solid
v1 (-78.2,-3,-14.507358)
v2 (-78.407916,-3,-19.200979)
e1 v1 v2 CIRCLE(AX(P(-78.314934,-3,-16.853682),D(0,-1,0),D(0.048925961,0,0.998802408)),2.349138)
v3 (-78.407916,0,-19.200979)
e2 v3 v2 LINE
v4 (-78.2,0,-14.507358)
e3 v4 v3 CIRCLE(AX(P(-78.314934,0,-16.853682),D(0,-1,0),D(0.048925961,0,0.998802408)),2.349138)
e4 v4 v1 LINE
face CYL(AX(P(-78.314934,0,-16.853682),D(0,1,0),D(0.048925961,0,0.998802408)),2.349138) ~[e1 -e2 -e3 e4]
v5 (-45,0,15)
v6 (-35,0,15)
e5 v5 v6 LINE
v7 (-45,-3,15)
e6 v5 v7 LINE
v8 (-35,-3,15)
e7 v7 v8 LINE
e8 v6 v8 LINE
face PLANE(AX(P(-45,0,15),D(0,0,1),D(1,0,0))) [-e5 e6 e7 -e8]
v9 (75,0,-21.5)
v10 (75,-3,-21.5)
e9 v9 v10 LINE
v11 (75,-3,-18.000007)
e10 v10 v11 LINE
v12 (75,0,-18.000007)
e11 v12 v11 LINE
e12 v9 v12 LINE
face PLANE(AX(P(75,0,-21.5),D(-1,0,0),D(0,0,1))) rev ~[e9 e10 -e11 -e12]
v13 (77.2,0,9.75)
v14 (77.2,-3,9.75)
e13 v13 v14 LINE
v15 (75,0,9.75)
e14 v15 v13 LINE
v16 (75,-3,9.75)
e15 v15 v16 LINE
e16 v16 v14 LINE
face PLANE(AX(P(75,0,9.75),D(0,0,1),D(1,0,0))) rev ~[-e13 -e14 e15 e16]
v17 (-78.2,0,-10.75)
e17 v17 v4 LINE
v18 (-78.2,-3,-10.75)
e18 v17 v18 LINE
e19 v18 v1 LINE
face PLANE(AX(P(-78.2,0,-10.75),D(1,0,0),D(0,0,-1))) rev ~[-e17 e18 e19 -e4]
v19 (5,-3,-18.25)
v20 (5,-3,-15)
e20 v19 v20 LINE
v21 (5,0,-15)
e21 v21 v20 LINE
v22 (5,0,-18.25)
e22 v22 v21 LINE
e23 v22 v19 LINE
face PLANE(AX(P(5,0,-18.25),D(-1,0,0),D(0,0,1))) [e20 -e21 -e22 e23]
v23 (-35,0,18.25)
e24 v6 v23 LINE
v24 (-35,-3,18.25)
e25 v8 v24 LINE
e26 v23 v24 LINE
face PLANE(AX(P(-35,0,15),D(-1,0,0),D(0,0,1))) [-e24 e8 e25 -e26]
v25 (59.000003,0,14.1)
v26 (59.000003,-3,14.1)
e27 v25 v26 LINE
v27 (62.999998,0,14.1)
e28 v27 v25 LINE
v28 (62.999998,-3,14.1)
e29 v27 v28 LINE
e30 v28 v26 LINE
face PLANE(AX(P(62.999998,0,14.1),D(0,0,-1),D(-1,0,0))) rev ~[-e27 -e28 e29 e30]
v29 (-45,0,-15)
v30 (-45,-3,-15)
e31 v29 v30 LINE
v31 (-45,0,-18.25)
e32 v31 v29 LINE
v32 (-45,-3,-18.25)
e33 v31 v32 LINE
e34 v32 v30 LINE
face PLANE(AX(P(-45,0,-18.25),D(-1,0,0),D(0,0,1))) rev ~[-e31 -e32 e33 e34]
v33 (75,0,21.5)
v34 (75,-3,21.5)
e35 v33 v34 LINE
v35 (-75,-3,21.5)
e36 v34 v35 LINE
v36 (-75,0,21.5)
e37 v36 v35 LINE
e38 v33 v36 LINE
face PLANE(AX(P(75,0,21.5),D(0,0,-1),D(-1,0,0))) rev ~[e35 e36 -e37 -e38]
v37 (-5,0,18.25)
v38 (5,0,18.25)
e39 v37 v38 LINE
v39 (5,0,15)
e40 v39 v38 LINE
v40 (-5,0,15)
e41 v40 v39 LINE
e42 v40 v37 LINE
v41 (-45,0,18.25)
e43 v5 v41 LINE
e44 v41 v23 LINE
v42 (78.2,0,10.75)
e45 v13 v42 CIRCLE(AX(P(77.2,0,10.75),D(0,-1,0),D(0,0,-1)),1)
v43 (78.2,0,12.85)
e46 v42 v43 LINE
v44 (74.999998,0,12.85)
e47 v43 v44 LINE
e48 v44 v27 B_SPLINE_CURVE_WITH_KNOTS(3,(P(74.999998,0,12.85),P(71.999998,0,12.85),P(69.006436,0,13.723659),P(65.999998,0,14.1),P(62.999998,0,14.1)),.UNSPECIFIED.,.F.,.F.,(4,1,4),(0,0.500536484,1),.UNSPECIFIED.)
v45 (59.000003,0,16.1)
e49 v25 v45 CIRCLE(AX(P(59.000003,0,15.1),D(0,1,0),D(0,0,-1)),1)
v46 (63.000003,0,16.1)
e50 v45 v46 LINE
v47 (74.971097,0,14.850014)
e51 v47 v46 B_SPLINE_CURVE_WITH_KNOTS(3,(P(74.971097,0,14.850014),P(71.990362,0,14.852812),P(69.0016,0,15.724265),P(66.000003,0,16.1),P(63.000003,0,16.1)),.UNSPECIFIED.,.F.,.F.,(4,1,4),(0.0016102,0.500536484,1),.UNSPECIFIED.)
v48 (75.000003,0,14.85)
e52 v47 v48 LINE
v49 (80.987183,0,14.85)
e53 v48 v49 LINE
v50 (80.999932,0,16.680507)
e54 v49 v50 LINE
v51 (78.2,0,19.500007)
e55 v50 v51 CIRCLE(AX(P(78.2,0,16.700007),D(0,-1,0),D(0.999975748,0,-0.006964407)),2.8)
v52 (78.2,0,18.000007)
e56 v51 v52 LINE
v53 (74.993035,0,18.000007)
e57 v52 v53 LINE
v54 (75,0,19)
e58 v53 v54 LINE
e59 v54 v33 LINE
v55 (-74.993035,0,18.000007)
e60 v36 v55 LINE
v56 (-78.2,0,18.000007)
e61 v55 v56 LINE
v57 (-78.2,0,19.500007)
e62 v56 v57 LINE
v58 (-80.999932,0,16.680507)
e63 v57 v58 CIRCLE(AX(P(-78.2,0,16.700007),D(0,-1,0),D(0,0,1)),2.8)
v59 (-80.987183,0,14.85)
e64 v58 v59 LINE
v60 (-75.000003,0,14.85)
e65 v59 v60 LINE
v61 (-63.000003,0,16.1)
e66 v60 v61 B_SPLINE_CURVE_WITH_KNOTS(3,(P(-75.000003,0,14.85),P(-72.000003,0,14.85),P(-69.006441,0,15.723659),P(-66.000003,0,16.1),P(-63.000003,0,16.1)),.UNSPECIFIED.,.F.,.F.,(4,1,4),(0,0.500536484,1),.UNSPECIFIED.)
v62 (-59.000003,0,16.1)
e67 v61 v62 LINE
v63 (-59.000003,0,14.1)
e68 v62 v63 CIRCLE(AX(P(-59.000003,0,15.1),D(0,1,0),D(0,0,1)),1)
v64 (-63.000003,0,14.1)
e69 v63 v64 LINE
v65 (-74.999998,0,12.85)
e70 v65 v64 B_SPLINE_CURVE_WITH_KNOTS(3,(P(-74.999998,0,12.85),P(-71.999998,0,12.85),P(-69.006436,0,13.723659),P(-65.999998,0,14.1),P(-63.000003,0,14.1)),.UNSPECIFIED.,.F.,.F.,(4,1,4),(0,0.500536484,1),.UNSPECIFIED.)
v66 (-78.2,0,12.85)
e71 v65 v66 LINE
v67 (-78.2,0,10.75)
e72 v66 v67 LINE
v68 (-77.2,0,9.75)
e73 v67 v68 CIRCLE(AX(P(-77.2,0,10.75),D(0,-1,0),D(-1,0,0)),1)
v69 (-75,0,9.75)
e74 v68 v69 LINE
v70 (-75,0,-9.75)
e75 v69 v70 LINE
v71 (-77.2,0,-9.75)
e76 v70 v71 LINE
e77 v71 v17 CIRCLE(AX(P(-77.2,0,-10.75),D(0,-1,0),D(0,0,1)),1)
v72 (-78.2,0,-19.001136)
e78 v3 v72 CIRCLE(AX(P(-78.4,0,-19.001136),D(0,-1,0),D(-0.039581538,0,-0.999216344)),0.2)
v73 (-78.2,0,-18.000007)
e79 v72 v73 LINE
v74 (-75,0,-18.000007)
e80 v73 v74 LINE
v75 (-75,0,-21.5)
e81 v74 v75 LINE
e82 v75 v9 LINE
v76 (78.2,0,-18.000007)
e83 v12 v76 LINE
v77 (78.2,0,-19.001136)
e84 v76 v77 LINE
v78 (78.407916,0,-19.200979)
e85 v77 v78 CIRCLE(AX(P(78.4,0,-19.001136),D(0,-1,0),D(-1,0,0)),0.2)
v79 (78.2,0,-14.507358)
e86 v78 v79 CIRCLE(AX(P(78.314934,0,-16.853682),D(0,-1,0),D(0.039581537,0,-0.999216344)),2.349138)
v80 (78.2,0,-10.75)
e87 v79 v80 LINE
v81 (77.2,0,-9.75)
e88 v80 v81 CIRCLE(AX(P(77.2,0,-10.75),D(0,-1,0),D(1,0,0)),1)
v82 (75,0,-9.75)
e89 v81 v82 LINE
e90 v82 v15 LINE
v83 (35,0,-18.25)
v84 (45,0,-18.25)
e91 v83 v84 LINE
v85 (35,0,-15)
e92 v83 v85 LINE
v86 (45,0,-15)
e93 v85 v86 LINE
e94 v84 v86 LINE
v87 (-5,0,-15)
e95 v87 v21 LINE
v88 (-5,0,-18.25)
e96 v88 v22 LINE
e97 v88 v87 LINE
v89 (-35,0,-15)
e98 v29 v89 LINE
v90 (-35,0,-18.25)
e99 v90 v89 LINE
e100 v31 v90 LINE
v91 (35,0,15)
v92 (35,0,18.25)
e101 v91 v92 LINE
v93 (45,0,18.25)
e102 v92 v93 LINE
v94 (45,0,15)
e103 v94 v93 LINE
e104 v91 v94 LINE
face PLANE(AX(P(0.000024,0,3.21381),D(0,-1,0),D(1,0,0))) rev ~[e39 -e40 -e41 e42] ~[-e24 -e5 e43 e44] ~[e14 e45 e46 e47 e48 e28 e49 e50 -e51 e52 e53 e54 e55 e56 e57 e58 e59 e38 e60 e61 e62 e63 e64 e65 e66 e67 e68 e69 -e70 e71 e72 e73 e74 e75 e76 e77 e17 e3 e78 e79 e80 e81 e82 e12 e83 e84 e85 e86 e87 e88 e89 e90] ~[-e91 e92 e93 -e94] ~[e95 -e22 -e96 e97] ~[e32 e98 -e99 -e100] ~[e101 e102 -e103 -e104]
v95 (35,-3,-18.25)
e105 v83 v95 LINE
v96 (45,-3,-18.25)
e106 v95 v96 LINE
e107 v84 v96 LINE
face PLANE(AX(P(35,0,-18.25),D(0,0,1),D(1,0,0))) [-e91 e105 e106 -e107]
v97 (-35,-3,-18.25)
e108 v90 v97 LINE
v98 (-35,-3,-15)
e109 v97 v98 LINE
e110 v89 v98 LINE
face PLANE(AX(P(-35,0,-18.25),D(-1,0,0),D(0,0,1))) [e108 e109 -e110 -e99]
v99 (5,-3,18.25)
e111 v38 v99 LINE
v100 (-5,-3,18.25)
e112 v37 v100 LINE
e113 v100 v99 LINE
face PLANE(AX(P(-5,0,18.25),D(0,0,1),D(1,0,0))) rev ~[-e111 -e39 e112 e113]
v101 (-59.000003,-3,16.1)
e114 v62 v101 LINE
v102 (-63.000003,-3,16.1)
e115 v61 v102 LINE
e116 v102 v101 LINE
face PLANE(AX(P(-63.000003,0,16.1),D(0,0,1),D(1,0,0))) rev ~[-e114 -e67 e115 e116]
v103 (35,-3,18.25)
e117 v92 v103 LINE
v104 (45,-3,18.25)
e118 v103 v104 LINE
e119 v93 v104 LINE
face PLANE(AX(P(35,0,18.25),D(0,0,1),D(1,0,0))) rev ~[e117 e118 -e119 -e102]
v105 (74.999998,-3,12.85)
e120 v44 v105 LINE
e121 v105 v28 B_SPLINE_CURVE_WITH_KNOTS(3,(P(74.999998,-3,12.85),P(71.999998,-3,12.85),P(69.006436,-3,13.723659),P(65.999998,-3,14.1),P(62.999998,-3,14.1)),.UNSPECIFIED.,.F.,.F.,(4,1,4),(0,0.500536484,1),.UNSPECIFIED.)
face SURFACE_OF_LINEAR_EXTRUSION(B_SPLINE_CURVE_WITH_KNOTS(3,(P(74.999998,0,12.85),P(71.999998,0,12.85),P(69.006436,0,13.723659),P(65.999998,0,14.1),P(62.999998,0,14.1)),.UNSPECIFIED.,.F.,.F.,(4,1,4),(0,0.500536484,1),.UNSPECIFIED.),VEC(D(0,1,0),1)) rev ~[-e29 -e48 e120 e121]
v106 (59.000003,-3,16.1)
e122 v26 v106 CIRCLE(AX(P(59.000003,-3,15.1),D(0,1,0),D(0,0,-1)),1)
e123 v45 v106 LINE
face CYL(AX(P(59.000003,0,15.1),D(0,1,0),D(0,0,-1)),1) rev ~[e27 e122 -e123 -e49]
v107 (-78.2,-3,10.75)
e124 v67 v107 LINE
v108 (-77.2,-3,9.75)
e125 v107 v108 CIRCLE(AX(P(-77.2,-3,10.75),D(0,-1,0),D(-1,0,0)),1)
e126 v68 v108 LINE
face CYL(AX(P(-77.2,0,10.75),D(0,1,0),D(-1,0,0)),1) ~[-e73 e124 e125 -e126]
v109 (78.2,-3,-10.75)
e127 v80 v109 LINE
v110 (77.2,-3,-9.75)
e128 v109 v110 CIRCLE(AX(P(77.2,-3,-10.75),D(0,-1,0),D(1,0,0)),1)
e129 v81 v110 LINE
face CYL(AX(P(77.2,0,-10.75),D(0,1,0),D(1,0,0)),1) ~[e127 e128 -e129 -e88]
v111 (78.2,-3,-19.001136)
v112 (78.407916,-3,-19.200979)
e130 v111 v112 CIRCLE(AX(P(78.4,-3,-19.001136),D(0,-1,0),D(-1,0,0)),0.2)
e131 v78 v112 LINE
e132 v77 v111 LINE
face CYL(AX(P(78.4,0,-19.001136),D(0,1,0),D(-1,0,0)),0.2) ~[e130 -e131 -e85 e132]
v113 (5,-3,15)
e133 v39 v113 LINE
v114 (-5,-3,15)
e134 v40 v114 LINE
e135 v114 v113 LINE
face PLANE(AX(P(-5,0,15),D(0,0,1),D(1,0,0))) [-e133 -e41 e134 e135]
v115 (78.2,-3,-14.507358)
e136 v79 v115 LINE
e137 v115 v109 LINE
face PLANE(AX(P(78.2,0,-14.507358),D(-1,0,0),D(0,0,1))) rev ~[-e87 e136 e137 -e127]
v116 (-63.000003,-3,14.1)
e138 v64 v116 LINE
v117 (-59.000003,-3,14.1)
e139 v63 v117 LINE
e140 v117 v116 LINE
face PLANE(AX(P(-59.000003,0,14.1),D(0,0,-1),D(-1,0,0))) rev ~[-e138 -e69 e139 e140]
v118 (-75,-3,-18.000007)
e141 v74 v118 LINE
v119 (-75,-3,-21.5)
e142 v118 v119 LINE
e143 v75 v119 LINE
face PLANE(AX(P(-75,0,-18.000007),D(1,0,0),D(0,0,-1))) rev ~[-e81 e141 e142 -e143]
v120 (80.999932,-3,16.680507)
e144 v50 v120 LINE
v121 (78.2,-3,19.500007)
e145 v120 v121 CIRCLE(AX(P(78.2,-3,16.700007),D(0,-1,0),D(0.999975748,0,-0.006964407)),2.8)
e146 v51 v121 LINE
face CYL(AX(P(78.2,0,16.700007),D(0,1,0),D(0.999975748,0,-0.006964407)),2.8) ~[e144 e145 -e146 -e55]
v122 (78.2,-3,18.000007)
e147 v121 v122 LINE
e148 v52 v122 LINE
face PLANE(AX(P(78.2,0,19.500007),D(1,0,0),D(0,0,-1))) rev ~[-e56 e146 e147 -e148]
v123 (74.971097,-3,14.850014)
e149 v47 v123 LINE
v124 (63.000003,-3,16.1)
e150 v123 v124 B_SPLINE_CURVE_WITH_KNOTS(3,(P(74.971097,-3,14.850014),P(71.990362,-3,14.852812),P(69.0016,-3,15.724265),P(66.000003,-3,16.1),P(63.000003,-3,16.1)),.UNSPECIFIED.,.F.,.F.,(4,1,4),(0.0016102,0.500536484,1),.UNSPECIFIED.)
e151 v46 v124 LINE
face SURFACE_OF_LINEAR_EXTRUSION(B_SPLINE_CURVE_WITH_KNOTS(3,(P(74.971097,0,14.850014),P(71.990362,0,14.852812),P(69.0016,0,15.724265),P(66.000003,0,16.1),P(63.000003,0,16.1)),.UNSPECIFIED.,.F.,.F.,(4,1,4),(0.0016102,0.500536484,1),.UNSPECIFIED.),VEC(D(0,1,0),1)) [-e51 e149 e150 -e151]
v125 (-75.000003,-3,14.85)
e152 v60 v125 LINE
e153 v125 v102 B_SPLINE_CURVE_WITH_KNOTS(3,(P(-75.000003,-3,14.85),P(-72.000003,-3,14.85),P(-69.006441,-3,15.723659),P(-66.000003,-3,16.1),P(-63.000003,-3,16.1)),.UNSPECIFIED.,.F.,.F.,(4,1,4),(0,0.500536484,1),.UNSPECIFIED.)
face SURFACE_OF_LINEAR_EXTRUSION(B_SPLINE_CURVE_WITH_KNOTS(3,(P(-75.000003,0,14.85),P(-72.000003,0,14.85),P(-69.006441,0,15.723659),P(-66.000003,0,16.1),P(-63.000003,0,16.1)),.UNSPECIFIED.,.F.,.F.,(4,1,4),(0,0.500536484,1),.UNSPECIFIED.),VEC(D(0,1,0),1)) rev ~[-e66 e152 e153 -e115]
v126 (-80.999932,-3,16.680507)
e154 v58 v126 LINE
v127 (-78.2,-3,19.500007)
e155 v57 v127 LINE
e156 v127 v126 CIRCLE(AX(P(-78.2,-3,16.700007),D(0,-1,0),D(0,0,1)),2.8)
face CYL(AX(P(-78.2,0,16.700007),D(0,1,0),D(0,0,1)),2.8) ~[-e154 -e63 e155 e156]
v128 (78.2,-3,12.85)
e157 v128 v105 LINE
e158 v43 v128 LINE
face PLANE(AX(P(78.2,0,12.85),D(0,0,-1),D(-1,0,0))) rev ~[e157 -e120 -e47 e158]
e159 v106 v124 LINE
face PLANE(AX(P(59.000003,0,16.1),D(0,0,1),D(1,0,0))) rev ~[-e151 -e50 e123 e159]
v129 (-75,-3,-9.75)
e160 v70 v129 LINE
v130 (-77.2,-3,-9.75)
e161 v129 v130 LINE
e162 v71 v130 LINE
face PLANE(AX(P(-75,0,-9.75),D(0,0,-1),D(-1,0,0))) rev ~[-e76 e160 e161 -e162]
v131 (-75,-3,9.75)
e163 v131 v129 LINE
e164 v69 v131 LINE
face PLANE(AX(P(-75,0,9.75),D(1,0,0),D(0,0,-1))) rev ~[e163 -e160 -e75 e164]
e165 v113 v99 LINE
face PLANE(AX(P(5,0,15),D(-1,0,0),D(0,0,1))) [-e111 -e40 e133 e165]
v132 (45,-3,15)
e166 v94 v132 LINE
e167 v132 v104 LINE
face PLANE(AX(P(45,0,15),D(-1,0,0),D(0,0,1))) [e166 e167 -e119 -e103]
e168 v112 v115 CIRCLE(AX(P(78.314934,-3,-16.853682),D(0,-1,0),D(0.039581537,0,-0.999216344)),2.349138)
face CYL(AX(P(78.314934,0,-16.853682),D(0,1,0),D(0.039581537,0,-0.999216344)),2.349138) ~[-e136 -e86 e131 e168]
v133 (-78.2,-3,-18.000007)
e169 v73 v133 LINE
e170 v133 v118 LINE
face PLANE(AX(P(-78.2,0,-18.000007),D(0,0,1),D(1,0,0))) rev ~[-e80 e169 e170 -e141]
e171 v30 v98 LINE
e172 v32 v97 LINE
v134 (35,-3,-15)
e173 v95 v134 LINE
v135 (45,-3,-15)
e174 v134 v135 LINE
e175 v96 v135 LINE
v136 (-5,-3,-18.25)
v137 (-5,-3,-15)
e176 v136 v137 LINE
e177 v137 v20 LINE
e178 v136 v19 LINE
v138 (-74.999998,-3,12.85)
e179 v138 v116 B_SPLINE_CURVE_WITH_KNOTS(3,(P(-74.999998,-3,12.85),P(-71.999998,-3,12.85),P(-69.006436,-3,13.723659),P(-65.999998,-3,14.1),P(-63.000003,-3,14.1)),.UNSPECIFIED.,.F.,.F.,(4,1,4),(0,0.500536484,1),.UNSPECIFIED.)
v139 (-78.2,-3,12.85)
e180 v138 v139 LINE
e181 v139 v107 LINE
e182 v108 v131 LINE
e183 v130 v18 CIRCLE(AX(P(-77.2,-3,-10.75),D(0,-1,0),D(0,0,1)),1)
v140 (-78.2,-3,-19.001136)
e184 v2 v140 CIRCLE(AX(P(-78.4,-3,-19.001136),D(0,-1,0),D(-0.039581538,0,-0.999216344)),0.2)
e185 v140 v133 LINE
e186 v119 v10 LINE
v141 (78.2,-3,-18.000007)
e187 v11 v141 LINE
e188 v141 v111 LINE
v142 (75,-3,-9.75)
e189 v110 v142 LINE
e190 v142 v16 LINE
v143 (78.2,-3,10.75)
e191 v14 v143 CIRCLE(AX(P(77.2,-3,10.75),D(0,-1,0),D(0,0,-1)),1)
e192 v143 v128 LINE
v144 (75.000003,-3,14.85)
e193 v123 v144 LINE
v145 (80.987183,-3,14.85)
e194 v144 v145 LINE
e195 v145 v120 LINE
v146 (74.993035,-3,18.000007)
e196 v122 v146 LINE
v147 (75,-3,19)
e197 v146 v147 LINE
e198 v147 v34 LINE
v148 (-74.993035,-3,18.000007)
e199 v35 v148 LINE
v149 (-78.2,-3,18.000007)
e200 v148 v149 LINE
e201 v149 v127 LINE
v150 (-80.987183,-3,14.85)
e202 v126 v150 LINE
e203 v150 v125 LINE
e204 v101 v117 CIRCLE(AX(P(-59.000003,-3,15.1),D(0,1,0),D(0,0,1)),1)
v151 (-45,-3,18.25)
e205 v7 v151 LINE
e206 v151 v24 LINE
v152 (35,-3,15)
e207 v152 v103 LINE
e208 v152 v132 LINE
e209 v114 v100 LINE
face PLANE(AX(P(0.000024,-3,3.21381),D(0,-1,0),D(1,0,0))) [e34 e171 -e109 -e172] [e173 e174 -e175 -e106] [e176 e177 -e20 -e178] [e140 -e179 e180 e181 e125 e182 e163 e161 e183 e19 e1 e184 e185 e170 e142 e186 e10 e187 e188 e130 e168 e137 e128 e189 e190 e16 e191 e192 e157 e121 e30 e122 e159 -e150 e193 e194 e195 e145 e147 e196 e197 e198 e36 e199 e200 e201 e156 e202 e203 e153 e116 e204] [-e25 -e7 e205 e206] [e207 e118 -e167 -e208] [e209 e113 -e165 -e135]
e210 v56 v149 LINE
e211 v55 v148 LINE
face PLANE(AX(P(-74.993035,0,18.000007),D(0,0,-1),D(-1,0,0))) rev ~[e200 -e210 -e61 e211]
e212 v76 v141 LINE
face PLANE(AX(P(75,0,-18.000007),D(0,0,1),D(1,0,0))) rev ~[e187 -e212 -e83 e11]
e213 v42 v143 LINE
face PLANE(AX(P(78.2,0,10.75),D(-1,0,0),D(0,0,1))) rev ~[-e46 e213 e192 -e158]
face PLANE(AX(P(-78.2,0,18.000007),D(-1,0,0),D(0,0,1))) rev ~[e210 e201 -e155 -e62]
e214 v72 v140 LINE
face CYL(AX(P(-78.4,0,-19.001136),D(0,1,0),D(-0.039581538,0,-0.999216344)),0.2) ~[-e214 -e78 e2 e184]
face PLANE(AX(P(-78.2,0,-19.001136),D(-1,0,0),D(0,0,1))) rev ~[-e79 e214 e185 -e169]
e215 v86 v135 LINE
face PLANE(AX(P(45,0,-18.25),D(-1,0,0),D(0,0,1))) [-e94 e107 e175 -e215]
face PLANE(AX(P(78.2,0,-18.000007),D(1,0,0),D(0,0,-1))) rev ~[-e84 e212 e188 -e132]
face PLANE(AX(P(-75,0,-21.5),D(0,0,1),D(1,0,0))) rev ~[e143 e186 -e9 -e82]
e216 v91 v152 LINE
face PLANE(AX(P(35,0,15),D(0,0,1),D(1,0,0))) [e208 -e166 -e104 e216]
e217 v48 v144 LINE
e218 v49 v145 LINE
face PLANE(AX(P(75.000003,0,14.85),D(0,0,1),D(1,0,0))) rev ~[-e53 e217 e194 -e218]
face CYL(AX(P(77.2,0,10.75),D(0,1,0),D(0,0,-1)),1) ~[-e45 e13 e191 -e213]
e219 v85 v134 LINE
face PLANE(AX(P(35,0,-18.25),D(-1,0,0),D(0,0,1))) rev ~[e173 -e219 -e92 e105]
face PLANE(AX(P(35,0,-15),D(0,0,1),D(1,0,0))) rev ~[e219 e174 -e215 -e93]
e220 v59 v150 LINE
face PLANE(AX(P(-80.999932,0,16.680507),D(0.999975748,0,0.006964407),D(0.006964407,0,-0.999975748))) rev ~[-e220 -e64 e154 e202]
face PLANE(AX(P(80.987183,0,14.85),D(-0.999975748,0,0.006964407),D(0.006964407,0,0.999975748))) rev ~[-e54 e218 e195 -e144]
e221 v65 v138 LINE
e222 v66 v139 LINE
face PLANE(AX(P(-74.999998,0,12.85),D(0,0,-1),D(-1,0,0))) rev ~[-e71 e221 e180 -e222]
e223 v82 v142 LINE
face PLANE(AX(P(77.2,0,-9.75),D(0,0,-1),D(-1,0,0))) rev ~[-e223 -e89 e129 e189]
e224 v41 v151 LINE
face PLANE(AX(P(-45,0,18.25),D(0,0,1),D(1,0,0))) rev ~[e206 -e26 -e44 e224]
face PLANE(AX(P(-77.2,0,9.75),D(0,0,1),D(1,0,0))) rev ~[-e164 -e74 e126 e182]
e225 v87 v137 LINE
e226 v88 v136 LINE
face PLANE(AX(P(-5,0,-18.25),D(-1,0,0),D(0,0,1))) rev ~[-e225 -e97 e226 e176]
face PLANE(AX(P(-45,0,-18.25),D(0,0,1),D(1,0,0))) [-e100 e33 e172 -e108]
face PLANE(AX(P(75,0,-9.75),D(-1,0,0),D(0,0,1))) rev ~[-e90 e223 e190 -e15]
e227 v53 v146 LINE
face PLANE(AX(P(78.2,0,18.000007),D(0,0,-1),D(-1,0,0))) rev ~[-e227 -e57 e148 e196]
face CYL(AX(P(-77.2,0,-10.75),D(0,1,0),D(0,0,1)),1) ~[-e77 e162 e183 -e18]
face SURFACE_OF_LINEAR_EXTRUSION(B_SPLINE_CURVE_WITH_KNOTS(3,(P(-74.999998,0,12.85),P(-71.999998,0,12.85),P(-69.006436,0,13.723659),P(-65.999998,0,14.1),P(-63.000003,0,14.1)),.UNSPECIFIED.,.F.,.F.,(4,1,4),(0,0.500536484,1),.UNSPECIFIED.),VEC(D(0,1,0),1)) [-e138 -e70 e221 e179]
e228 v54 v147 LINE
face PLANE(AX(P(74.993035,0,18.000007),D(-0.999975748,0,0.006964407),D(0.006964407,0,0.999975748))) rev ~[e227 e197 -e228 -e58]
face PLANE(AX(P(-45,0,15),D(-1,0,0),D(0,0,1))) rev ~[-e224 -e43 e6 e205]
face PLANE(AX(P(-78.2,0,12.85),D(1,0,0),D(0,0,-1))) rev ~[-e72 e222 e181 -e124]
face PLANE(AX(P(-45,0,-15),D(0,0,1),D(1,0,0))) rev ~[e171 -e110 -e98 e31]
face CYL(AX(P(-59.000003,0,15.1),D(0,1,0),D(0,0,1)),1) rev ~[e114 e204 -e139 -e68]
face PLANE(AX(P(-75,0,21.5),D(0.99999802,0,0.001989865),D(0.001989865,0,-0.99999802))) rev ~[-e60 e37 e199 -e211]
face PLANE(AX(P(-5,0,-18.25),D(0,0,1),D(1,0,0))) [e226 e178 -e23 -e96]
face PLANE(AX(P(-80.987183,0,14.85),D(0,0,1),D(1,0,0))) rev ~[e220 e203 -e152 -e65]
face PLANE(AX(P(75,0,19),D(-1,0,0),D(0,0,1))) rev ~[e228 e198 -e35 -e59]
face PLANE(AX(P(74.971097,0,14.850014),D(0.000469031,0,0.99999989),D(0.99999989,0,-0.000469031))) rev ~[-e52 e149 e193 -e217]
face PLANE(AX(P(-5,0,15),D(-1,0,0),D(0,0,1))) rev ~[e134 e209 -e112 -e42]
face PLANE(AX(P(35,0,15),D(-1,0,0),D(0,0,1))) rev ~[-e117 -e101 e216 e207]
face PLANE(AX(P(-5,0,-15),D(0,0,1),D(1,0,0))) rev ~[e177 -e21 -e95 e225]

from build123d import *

# Parameters (mm, degrees)
F0_W     = 10
F0_H     = 3.25
F1_DEPTH = 3


# Not quite as in the source:
# - ends of sketch curves that miss each other by under 0.0002 mm in the source are joined


with BuildPart() as f1:
    # F0 (on Front) → F1 (new body)
    with BuildSketch(Plane.XZ):
        with BuildLine():
            Line((75, 21.5), (-75, 21.5))
            Line((-75, 21.5), (-74.9930354723, 18.0000069292))
            Line((-74.9930354723, 18.0000069292), (-78.2, 18.0000069292))
            Line((-78.2, 18.0000069292), (-78.2, 19.5000069292))
            ThreePointArc((-78.2, 19.5000069292), (-80.1867814364, 18.6729994594), (-80.999932095, 16.6805065893))
            Line((-80.999932095, 16.6805065893), (-80.9871833927, 14.85))
            Line((-80.9871833927, 14.85), (-75.0000029802, 14.85))
            add(Edge.make_bspline(
                [(-75.0000029802, 14.85), (-72.0000029802, 14.85), (-69.0064407929, 15.7236590768), (-66.0000029802, 16.1), (-63.0000029802, 16.1)],
                knots=[0, 0, 0, 0, 0.5005364838, 1, 1, 1, 1], degree=3))
            Line((-63.0000029802, 16.1), (-59.0000029802, 16.1))
            ThreePointArc((-59.0000029802, 16.1), (-58.0000029802, 15.1), (-59.0000029802, 14.1))
            Line((-59.0000029802, 14.1), (-63.0000029802, 14.1))
            add(Edge.make_bspline(
                [(-74.9999980132, 12.85), (-71.9999980132, 12.85), (-69.0064358259, 13.7236590768), (-65.9999980132, 14.1), (-63.0000029802, 14.1)],
                knots=[0, 0, 0, 0, 0.5005364838, 1, 1, 1, 1], degree=3))
            Line((-74.9999980132, 12.85), (-78.2, 12.85))
            Line((-78.2, 12.85), (-78.2, 10.75))
            ThreePointArc((-78.2, 10.75), (-77.9071067812, 10.0428932188), (-77.2, 9.75))
            Line((-77.2, 9.75), (-75, 9.75))
            Line((-75, 9.75), (-75, -9.75))
            Line((-75, -9.75), (-75, -18.0000069292))
            Line((-75, -18.0000069292), (-75, -21.5))
            Line((-75, -21.5), (75, -21.5))
            Line((75, -21.5), (75, -18.0000069292))
            Line((75, -18.0000069292), (75, -9.75))
            Line((75, -9.75), (75, 9.75))
            Line((75, 9.75), (77.2, 9.75))
            ThreePointArc((77.2, 9.75), (77.9071067812, 10.0428932188), (78.2, 10.75))
            Line((78.2, 10.75), (78.2, 12.85))
            Line((78.2, 12.85), (74.9999980132, 12.85))
            add(Edge.make_bspline(
                [(74.9999980132, 12.85), (71.9999980132, 12.85), (69.0064358259, 13.7236590768), (65.9999980132, 14.1), (62.9999980132, 14.1)],
                knots=[0, 0, 0, 0, 0.5005364838, 1, 1, 1, 1], degree=3))
            Line((62.9999980132, 14.1), (59.0000029802, 14.1))
            ThreePointArc((59.0000029802, 14.1), (58.0000029802, 15.1), (59.0000029802, 16.1))
            Line((59.0000029802, 16.1), (63.0000029802, 16.1))
            add(Edge.make_bspline(
                [(74.9710970223, 14.8500135578), (71.9903624817, 14.8528122415), (69.001599828, 15.7242650608), (66.0000029802, 16.1), (63.0000029802, 16.1)],
                knots=[0.0016101996, 0.0016101996, 0.0016101996, 0.0016101996, 0.5005364838, 1, 1, 1, 1], degree=3))
            Line((74.9710970223, 14.8500135578), (75.0000029802, 14.85))
            Line((75.0000029802, 14.85), (80.9871833927, 14.85))
            Line((80.9871833927, 14.85), (80.999932095, 16.6805065893))
            ThreePointArc((80.999932095, 16.6805065893), (80.1867814364, 18.6729994594), (78.2, 19.5000069292))
            Line((78.2, 19.5000069292), (78.2, 18.0000069292))
            Line((78.2, 18.0000069292), (74.9930354723, 18.0000069292))
            Line((74.9930354723, 18.0000069292), (75, 19))
            Line((75, 19), (75, 21.5))
        make_face()
        with Locations((-40, -16.625)):
            Rectangle(F0_W, F0_H, mode=Mode.SUBTRACT)
        with Locations((0, -16.625)):
            Rectangle(F0_W, F0_H, mode=Mode.SUBTRACT)
        with Locations((40, -16.625)):
            Rectangle(F0_W, F0_H, mode=Mode.SUBTRACT)
        with Locations((-40, 16.625)):
            Rectangle(F0_W, F0_H, mode=Mode.SUBTRACT)
        with Locations((0, 16.625)):
            Rectangle(F0_W, F0_H, mode=Mode.SUBTRACT)
        with Locations((40, 16.625)):
            Rectangle(F0_W, F0_H, mode=Mode.SUBTRACT)
        with BuildLine():
            Line((-75, -18.0000069292), (-75, -9.75))
            Line((-75, -9.75), (-77.2, -9.75))
            ThreePointArc((-77.2, -9.75), (-77.9071067812, -10.0428932188), (-78.2, -10.75))
            Line((-78.2, -10.75), (-78.2, -12.384363041))
            Line((-78.2, -12.384363041), (-78.2, -14.5073579624))
            ThreePointArc((-78.2, -14.5073579624), (-80.6617701682, -16.7497231552), (-78.4079163074, -19.2009793215))
            ThreePointArc((-78.4079163074, -19.2009793215), (-78.2614057387, -19.1453290857), (-78.2, -19.0011360528))
            Line((-78.2, -19.0011360528), (-78.2, -18.0000069292))
            Line((-78.2, -18.0000069292), (-75, -18.0000069292))
        make_face()
        with BuildLine():
            Line((77.2, -9.75), (75, -9.75))
            Line((75, -9.75), (75, -18.0000069292))
            Line((75, -18.0000069292), (78.2, -18.0000069292))
            Line((78.2, -18.0000069292), (78.2, -19.0011360528))
            ThreePointArc((78.2, -19.0011360528), (78.2614057387, -19.1453290857), (78.4079163074, -19.2009793215))
            ThreePointArc((78.4079163074, -19.2009793215), (80.6617701682, -16.7497231552), (78.2, -14.5073579624))
            Line((78.2, -14.5073579624), (78.2, -12.384363041))
            Line((78.2, -12.384363041), (78.2, -10.75))
            ThreePointArc((78.2, -10.75), (77.9071067812, -10.0428932188), (77.2, -9.75))
        make_face()
    extrude(amount=F1_DEPTH)


solid = f1.part
